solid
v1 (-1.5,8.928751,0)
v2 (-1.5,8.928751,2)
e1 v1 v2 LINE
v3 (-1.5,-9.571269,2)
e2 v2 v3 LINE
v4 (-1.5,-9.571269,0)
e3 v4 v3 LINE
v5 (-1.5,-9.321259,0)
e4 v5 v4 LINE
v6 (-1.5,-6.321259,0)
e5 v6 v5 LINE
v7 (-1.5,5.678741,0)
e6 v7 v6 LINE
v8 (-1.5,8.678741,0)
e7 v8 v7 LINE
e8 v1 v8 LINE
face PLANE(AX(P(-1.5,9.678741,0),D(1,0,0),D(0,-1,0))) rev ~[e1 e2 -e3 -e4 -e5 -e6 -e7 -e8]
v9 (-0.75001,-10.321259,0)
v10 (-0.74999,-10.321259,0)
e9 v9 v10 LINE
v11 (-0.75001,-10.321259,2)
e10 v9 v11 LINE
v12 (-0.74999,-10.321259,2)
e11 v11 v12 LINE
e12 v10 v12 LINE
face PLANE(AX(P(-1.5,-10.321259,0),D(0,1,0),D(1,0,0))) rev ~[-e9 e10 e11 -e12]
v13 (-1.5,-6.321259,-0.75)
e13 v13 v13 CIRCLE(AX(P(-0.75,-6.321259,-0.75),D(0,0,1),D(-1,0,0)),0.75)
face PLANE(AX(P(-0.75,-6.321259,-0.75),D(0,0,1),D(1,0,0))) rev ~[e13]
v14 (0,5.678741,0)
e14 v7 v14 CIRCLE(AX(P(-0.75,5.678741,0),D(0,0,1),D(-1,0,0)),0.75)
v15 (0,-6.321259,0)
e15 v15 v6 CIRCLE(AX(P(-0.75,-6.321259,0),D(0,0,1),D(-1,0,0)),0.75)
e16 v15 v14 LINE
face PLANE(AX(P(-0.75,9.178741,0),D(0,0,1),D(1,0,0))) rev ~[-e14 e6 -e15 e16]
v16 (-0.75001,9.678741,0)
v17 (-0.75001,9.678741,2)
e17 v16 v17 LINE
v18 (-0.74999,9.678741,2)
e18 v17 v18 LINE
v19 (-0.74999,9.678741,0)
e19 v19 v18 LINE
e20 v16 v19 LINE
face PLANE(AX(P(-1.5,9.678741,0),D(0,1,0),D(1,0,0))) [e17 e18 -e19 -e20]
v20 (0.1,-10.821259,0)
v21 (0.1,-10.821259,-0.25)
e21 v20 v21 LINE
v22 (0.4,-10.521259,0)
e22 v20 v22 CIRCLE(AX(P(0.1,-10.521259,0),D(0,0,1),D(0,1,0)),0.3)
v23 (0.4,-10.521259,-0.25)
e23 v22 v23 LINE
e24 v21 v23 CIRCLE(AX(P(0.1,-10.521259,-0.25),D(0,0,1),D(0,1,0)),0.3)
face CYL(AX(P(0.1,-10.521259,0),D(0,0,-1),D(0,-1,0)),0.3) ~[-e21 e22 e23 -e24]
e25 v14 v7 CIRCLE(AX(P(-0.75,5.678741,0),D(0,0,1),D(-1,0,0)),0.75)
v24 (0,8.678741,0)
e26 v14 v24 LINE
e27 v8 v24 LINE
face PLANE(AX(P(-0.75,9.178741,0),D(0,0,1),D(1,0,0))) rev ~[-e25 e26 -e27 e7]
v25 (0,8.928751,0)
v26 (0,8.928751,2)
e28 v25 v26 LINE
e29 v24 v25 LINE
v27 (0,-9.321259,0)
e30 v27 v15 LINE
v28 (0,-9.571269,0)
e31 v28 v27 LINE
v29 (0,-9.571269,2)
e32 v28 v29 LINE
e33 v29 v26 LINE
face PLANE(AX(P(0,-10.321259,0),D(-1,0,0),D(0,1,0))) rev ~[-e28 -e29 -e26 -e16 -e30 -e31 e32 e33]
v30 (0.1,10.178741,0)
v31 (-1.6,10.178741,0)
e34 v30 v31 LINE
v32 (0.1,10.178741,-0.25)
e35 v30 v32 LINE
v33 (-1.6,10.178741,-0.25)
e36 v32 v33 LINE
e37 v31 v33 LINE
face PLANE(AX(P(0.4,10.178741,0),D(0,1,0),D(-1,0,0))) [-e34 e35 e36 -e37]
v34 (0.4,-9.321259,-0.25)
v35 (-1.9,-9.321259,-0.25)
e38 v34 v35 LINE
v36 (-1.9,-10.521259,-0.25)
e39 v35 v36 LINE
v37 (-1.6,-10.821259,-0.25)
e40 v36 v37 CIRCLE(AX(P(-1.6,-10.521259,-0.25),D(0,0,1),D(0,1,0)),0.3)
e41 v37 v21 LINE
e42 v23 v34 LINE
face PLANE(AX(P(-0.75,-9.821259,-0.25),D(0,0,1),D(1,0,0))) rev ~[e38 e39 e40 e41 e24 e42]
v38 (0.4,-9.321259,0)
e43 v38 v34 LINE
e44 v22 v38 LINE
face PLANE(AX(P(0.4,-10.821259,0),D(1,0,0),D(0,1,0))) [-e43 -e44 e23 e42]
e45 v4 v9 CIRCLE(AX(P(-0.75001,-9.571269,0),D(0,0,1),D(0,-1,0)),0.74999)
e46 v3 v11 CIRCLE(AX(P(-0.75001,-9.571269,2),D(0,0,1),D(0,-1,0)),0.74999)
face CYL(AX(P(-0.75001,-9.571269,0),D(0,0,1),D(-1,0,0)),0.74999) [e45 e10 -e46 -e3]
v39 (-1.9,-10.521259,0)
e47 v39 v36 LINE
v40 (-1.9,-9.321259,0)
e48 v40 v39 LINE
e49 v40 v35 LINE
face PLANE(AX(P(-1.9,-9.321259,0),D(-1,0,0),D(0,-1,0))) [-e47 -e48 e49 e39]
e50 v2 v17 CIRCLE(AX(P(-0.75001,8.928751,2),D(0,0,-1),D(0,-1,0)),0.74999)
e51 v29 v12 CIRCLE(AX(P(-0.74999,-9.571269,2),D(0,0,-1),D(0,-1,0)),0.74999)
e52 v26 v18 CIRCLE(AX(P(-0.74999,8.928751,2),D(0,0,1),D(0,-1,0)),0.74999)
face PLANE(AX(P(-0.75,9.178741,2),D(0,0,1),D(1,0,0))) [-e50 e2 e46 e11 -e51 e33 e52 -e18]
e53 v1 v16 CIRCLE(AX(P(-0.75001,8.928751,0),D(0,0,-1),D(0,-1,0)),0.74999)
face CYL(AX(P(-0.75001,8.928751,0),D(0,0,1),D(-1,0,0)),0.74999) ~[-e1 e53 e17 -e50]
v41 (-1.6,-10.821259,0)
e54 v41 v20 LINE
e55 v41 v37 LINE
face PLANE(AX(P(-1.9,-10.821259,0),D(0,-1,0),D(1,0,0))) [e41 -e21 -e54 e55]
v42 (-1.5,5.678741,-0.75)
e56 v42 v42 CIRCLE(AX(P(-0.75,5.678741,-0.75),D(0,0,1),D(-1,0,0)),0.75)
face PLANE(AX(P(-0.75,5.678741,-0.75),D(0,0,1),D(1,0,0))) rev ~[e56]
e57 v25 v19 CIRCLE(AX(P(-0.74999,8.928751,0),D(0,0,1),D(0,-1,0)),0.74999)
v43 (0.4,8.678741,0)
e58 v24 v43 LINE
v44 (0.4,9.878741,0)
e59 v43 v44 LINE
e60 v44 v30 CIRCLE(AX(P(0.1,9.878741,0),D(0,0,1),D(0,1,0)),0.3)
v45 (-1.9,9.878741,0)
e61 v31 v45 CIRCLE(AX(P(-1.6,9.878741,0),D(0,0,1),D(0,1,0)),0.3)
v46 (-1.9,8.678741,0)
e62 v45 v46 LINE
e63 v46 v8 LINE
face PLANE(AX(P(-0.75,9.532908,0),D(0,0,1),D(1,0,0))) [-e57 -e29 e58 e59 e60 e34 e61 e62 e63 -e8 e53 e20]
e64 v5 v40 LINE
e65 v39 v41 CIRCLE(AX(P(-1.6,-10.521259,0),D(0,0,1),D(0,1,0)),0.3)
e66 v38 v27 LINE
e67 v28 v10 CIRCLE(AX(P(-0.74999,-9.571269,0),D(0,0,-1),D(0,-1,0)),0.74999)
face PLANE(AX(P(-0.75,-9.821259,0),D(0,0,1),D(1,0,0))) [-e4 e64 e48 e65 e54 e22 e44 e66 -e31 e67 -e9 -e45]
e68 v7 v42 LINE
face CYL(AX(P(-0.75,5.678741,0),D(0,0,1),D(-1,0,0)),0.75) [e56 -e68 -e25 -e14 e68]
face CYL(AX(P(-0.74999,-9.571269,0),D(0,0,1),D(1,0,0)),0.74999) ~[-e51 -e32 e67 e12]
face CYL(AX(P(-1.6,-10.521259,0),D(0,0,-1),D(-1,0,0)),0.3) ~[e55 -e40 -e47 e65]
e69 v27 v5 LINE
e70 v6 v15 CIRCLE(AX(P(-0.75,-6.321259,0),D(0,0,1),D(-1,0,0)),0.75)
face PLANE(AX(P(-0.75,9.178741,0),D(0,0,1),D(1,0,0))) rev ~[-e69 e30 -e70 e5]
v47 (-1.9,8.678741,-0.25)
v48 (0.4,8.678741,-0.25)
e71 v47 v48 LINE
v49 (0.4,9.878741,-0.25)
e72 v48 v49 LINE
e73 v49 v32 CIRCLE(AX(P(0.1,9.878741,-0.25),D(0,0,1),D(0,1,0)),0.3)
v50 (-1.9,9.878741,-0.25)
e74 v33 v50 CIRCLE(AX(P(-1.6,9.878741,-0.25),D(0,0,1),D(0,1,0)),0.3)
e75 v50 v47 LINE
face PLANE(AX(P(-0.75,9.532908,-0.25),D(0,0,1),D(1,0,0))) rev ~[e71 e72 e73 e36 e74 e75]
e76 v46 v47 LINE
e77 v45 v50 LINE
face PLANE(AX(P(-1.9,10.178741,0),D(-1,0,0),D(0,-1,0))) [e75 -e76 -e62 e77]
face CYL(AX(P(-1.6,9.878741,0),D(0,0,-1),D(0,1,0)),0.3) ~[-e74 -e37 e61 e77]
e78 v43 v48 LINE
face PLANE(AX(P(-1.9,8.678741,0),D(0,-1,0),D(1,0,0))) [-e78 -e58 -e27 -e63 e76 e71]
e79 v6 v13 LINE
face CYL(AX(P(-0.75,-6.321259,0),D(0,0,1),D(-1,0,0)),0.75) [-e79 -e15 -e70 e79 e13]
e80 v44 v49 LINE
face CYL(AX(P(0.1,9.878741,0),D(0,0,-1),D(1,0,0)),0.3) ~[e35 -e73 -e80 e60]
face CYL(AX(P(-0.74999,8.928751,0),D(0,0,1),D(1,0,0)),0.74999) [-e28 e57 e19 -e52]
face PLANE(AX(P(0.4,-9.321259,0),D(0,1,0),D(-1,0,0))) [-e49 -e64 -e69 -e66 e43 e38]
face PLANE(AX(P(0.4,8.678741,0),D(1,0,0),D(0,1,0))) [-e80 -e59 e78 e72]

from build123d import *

# Parameters (mm, degrees)
F0_W     = 1.5
F0_H     = 1
F1_DEPTH = 2
F2_DEPTH = 0.25
F3_DEPTH = 0.75
F4_R     = 0.74999
F5_R     = 0.3


# Not quite as in the source:
# - a fillet or chamfer is up to 0.001 mm smaller than in the source, because OpenCascade refuses the exact size


with BuildPart() as f1:
    # F0 (on Top) → F1 (new body)
    with BuildSketch(Plane.XY):
        with Locations((-0.75, 9.1787409857)):
            Rectangle(F0_W, F0_H)
        with BuildLine():
            Line((0, 8.6787409857), (-1.5, 8.6787409857))
            Line((-1.5, 8.6787409857), (-1.5, 5.6787409857))
            ThreePointArc((-1.5, 5.6787409857), (-0.75, 6.4287409857), (0, 5.6787409857))
            Line((0, 5.6787409857), (0, 8.6787409857))
        make_face()
        with BuildLine():
            ThreePointArc((0, 5.6787409857), (-0.75, 6.4287409857), (-1.5, 5.6787409857))
            ThreePointArc((-1.5, 5.6787409857), (-0.75, 4.9287409857), (0, 5.6787409857))
        make_face()
        with BuildLine():
            ThreePointArc((0, 5.6787409857), (-0.75, 4.9287409857), (-1.5, 5.6787409857))
            Line((-1.5, 5.6787409857), (-1.5, -6.3212590143))
            ThreePointArc((-1.5, -6.3212590143), (-0.75, -5.5712590143), (0, -6.3212590143))
            Line((0, -6.3212590143), (0, 5.6787409857))
        make_face()
        with BuildLine():
            ThreePointArc((0, -6.3212590143), (-0.75, -5.5712590143), (-1.5, -6.3212590143))
            ThreePointArc((-1.5, -6.3212590143), (-0.75, -7.0712590143), (0, -6.3212590143))
        make_face()
        with BuildLine():
            ThreePointArc((0, -6.3212590143), (-0.75, -7.0712590143), (-1.5, -6.3212590143))
            Line((-1.5, -6.3212590143), (-1.5, -9.3212590143))
            Line((-1.5, -9.3212590143), (0, -9.3212590143))
            Line((0, -9.3212590143), (0, -6.3212590143))
        make_face()
        with Locations((-0.75, -9.8212590143)):
            Rectangle(F0_W, F0_H)
    extrude(amount=F1_DEPTH)

    # F0 (on Top) → F2 (join)
    with BuildSketch(Plane.XY):
        with Locations((-0.75, -9.8212590143)):
            Rectangle(F0_W, F0_H)
        Polygon((-1.5, -10.3212590143), (-1.5, -9.3212590143), (-1.9, -9.3212590143), (-1.9, -10.8212590143), (0.4, -10.8212590143), (0.4, -9.3212590143), (0, -9.3212590143), (0, -10.3212590143), align=None)
        Polygon((-1.5, 8.6787409857), (-1.5, 9.6787409857), (0, 9.6787409857), (0, 8.6787409857), (0.4, 8.6787409857), (0.4, 10.1787409857), (-1.9, 10.1787409857), (-1.9, 8.6787409857), align=None)
        with Locations((-0.75, 9.1787409857)):
            Rectangle(F0_W, F0_H)
    extrude(amount=-F2_DEPTH)

    # F0 (on Top) → F3 (join)
    with BuildSketch(Plane.XY):
        with BuildLine():
            ThreePointArc((0, -6.3212590143), (-0.75, -5.5712590143), (-1.5, -6.3212590143))
            ThreePointArc((-1.5, -6.3212590143), (-0.75, -7.0712590143), (0, -6.3212590143))
        make_face()
        with BuildLine():
            ThreePointArc((0, 5.6787409857), (-0.75, 6.4287409857), (-1.5, 5.6787409857))
            ThreePointArc((-1.5, 5.6787409857), (-0.75, 4.9287409857), (0, 5.6787409857))
        make_face()
    extrude(amount=-F3_DEPTH)

    # F4 (radius 0.75 in the source; OpenCascade refuses exactly that, so slightly less here)
    f4_edges = [f1.edges().sort_by_distance(p)[0] for p in [
        (0, 9.678741, 1),
        (-1.5, 9.678741, 1),
        (0, -10.321259, 1),
        (-1.5, -10.321259, 1),
    ]]
    fillet(f4_edges, radius=F4_R)

    # F5
    f5_edges = [f1.edges().sort_by_distance(p)[0] for p in [
        (0.4, 10.178741, -0.125),
        (-1.9, 10.178741, -0.125),
        (0.4, -10.821259, -0.125),
        (-1.9, -10.821259, -0.125),
    ]]
    fillet(f5_edges, radius=F5_R)


solid = f1.part
